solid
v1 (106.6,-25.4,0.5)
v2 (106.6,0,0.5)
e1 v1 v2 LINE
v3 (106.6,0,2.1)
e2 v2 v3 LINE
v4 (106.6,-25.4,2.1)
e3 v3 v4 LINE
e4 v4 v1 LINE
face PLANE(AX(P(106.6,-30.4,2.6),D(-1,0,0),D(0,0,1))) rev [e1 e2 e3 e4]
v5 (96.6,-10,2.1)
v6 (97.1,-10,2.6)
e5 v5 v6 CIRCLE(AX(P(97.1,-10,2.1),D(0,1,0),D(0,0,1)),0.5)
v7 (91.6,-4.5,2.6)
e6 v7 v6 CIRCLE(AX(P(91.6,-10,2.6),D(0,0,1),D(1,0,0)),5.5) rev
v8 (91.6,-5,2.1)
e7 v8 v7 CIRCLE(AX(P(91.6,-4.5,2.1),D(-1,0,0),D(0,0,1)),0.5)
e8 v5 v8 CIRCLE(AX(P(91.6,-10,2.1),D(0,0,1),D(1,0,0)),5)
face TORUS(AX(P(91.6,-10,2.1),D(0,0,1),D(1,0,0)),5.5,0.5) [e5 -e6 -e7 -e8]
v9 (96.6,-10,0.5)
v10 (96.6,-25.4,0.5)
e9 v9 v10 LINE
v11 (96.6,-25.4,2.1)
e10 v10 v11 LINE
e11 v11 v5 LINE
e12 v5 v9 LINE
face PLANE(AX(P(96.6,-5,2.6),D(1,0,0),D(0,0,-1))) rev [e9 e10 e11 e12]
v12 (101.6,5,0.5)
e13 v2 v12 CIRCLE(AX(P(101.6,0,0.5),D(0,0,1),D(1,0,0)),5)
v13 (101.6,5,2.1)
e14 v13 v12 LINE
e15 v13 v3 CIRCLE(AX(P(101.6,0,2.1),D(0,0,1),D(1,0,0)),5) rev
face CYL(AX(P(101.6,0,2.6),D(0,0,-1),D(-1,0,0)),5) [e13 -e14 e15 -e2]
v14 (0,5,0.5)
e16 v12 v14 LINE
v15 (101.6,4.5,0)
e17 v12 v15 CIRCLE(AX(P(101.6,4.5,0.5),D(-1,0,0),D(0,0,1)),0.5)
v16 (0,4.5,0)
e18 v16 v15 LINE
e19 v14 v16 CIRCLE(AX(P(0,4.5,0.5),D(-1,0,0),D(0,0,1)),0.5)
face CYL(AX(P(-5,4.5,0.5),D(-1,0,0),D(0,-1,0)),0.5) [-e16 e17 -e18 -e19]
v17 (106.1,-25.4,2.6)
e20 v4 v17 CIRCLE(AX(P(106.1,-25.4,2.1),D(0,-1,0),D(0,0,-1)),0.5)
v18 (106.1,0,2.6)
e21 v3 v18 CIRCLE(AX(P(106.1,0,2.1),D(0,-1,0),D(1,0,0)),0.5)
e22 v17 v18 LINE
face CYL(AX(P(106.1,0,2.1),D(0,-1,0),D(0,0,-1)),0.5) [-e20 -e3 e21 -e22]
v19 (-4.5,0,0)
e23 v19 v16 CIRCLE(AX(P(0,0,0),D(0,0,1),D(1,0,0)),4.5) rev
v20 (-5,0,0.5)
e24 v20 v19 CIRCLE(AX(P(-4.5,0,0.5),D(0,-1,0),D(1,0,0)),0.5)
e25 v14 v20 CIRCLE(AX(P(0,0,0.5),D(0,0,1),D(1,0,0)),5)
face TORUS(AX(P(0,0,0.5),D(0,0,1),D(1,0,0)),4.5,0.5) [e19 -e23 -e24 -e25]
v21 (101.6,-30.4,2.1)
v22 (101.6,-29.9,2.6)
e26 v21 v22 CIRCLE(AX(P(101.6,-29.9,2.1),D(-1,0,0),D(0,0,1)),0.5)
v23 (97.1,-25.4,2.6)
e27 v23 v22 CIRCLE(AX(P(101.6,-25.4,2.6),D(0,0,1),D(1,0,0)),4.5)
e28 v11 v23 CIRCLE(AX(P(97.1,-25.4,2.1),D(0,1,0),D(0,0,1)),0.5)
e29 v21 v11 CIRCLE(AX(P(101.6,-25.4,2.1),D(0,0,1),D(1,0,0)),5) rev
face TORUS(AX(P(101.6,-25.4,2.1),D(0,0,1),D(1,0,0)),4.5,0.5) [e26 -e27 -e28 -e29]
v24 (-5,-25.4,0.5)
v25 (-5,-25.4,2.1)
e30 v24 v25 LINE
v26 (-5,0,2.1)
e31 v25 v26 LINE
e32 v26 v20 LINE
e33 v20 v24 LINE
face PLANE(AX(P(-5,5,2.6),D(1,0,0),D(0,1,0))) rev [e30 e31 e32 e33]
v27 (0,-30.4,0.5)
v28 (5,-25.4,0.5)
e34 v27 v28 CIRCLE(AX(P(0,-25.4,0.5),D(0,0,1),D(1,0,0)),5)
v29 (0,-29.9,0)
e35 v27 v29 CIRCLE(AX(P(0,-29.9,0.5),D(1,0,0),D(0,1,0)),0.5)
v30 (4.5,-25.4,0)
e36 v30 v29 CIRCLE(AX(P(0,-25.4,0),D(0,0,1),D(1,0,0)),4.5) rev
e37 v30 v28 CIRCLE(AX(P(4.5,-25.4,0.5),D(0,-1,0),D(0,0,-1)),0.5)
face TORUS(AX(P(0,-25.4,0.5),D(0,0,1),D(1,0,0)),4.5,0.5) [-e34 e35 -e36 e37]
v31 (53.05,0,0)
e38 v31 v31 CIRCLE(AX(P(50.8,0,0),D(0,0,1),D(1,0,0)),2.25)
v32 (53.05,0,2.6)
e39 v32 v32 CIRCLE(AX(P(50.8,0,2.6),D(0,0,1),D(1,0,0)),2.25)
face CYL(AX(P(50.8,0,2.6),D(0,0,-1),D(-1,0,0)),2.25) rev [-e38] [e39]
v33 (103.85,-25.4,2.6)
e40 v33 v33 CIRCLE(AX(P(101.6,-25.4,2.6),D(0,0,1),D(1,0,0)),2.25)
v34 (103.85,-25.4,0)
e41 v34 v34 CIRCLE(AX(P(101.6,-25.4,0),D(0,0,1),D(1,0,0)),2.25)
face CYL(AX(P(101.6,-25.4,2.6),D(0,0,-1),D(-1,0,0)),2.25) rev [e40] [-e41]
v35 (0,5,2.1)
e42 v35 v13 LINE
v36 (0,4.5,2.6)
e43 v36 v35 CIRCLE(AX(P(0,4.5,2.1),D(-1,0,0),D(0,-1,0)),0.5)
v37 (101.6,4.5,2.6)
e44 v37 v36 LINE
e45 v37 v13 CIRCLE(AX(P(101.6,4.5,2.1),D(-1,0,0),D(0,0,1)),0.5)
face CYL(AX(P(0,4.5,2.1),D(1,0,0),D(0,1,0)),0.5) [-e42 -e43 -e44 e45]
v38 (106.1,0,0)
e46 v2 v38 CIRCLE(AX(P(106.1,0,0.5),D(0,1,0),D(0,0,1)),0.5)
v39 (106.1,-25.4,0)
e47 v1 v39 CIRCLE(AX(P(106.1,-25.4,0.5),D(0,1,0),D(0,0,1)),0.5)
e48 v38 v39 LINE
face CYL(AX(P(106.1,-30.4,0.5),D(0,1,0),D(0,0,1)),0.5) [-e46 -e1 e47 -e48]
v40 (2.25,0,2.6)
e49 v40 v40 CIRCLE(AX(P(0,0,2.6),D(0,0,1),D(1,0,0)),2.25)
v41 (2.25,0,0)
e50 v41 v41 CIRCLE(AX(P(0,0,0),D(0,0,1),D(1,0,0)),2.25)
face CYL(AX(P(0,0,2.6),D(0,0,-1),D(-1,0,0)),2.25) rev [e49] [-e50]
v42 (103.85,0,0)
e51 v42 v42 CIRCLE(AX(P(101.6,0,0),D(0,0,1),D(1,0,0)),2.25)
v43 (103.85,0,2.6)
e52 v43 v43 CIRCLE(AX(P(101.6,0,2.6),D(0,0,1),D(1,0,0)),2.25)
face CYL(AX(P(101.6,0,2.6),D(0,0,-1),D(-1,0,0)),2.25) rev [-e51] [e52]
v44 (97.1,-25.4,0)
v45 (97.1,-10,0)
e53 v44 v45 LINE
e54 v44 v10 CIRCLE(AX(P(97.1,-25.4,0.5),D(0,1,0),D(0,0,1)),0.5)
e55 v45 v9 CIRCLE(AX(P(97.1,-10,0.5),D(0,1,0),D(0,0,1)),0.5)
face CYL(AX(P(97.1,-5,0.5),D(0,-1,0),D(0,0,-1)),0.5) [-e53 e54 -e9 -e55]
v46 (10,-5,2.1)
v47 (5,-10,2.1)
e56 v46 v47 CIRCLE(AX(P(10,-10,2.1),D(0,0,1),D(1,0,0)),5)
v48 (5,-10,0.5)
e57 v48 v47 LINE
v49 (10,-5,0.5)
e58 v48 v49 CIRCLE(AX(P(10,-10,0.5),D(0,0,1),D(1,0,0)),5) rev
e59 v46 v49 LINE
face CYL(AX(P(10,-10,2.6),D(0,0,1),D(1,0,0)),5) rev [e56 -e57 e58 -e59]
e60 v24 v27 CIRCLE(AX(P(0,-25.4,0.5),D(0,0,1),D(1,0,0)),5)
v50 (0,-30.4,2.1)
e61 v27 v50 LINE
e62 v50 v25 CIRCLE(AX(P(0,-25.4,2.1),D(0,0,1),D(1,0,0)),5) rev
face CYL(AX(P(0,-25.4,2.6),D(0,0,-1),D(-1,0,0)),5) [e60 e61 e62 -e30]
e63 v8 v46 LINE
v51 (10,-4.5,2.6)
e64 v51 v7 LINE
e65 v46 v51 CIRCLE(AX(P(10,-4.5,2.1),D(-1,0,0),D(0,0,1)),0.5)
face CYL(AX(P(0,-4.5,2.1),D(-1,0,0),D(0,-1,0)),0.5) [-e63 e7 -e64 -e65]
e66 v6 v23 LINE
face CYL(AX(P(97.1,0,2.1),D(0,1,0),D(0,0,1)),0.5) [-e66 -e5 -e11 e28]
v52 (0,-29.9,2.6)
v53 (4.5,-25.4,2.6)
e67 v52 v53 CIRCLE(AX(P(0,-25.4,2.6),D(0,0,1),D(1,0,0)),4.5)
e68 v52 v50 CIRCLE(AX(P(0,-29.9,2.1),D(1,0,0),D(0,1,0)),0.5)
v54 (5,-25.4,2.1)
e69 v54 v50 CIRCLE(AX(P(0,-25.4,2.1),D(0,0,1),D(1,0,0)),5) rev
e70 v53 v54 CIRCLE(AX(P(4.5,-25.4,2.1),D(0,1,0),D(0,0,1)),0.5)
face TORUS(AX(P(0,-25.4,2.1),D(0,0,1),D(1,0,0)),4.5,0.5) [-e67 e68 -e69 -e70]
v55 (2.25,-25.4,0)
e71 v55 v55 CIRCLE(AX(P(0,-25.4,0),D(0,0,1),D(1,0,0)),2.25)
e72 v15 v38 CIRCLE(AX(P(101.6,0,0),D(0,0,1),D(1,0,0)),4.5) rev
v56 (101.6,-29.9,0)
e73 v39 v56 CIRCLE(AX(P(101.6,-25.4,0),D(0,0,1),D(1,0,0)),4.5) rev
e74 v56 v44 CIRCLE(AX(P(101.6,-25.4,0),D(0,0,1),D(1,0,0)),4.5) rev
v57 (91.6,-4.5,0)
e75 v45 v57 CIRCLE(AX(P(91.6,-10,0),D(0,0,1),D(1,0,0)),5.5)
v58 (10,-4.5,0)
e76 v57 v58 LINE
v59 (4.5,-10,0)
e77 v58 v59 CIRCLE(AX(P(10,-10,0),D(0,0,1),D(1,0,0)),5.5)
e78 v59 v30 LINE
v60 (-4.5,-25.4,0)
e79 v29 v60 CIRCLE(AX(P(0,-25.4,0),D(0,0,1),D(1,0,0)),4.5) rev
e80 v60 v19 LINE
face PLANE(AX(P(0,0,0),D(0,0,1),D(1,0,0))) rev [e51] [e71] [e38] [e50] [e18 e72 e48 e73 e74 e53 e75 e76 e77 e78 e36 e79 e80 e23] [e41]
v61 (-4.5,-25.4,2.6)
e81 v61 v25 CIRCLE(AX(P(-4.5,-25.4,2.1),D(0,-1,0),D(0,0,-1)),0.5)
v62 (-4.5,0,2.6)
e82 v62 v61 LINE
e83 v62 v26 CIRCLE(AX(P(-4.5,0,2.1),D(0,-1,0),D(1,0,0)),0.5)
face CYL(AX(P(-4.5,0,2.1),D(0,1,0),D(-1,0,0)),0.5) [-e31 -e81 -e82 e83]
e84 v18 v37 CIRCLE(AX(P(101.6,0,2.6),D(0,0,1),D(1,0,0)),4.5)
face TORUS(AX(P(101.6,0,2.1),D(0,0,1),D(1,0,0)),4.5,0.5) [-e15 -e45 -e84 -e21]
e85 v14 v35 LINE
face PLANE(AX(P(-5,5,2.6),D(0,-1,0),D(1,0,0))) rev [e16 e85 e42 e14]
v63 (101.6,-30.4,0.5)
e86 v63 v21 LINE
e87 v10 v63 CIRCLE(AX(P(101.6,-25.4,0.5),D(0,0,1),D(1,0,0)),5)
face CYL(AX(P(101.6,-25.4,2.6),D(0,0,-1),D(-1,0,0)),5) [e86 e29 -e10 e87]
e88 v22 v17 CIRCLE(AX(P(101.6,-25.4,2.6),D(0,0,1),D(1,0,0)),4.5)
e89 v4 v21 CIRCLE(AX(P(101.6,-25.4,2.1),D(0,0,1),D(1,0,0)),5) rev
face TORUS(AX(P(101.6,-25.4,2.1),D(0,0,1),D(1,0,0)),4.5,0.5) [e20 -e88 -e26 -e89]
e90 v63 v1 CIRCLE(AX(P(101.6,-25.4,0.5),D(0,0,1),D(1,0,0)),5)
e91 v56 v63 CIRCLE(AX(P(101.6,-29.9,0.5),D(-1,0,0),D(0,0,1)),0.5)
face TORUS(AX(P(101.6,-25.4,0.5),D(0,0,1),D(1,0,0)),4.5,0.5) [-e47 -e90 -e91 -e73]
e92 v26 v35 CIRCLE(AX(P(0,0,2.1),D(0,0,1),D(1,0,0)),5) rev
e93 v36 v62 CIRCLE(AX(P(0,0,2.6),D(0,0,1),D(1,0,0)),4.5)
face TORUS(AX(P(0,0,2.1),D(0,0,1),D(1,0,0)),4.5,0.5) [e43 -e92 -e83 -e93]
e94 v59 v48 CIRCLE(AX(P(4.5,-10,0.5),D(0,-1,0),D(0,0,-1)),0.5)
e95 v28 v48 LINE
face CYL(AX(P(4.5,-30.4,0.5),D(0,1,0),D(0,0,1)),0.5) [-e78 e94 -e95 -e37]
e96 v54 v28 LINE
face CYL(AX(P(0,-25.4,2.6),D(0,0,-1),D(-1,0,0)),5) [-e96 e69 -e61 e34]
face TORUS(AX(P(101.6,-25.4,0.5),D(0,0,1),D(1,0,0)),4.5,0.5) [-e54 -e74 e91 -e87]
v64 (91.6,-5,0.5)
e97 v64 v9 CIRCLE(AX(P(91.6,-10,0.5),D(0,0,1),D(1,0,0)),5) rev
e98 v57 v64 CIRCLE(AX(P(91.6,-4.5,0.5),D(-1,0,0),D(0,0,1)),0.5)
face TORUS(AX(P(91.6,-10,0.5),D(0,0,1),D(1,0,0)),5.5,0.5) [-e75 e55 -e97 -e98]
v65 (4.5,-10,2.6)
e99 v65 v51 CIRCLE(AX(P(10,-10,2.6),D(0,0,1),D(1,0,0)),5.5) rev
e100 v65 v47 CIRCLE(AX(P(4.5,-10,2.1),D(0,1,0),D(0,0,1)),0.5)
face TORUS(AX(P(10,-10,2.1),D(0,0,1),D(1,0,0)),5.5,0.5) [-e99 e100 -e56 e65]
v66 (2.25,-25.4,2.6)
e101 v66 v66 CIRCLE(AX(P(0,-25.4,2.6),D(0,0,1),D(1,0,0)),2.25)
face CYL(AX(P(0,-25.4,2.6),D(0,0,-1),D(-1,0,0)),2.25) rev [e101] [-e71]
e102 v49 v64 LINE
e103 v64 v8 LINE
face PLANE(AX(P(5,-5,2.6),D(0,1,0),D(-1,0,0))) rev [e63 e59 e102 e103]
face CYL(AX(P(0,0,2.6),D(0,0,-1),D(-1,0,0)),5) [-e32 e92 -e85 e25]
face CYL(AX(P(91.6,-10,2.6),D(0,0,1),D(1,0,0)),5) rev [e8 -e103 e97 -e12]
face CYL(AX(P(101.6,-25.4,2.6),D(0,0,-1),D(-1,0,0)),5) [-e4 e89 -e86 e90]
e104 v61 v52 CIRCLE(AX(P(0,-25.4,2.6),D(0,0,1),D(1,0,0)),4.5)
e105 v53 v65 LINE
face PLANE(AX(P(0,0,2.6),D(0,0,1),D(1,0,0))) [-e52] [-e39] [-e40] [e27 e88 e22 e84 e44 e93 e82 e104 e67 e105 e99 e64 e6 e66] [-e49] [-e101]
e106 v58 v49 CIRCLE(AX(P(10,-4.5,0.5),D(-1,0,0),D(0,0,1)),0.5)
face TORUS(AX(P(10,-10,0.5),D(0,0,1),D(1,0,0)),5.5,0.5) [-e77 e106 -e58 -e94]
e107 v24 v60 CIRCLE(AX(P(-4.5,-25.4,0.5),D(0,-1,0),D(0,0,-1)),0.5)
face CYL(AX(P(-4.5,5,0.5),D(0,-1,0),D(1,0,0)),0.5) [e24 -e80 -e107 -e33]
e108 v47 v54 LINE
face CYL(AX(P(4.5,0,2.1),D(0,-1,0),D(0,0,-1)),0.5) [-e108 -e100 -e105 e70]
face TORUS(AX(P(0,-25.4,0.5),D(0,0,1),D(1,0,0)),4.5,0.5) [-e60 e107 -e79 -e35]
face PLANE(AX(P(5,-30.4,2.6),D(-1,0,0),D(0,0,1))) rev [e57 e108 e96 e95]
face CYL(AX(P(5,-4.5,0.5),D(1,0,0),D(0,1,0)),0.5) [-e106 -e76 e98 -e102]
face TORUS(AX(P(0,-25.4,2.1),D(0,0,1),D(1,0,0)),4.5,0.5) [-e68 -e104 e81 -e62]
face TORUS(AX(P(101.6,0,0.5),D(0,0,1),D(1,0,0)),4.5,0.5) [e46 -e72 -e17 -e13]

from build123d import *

# Parameters (mm, degrees)
SKETCH1_R           = 2.25
BOSS_EXTRUDE1_DEPTH = 2.6
FILLET1_R           = 5
FILLET2_R           = 0.5


with BuildPart() as part:
    # Sketch1 → Boss-Extrude1 (new body)
    with BuildSketch(Plane.XY):
        Polygon((-5, 5), (-5, -30.4), (5, -30.4), (5, -5), (96.6, -5), (96.6, -30.4), (106.6, -30.4), (106.6, 5), align=None)
        Circle(SKETCH1_R, mode=Mode.SUBTRACT)
        with Locations((101.6, 0)):
            Circle(SKETCH1_R, mode=Mode.SUBTRACT)
        with Locations((0, -25.4)):
            Circle(SKETCH1_R, mode=Mode.SUBTRACT)
        with Locations((101.6, -25.4)):
            Circle(SKETCH1_R, mode=Mode.SUBTRACT)
        with Locations((50.8, 0)):
            Circle(SKETCH1_R, mode=Mode.SUBTRACT)
    extrude(amount=BOSS_EXTRUDE1_DEPTH)

    # Fillet1
    fillet1_edges = [part.edges().sort_by_distance(p)[0] for p in [
        (96.6, -30.4, 1.3),
        (106.6, -30.4, 1.3),
        (106.6, 5, 1.3),
        (96.6, -5, 1.3),
        (-5, 5, 1.3),
        (-5, -30.4, 1.3),
        (5, -30.4, 1.3),
        (5, -5, 1.3),
    ]]
    fillet(fillet1_edges, radius=FILLET1_R - 0.0001)  # a hair under: the kernel refuses the full size

    # Fillet2
    fillet2_edges = [part.edges().sort_by_distance(p)[0] for p in [
        (96.6, -17.7, 0),
        (50.8, -5, 0),
        (5, -17.7, 0),
        (-5, -12.7, 0),
        (50.8, 5, 0),
        (106.6, -12.7, 0),
        (3.535563195, -28.935563195, 0),
        (-3.535563195, -28.935563195, 0),
        (-3.535563195, 3.535563195, 0),
        (105.135563195, 3.535563195, 0),
        (105.135563195, -28.935563195, 0),
        (98.064436805, -28.935563195, 0),
        (96.6, -17.7, 2.6),
        (106.6, -12.7, 2.6),
        (50.8, 5, 2.6),
        (-5, -12.7, 2.6),
        (5, -17.7, 2.6),
        (50.8, -5, 2.6),
        (3.535563195, -28.935563195, 2.6),
        (-3.535563195, -28.935563195, 2.6),
        (-3.535563195, 3.535563195, 2.6),
        (105.135563195, 3.535563195, 2.6),
        (105.135563195, -28.935563195, 2.6),
        (98.064436805, -28.935563195, 2.6),
        (95.135563195, -6.464436805, 0),
        (95.135563195, -6.464436805, 2.6),
        (6.464436805, -6.464436805, 0),
        (6.464436805, -6.464436805, 2.6),
    ]]
    fillet(fillet2_edges, radius=FILLET2_R)


solid = part.part
